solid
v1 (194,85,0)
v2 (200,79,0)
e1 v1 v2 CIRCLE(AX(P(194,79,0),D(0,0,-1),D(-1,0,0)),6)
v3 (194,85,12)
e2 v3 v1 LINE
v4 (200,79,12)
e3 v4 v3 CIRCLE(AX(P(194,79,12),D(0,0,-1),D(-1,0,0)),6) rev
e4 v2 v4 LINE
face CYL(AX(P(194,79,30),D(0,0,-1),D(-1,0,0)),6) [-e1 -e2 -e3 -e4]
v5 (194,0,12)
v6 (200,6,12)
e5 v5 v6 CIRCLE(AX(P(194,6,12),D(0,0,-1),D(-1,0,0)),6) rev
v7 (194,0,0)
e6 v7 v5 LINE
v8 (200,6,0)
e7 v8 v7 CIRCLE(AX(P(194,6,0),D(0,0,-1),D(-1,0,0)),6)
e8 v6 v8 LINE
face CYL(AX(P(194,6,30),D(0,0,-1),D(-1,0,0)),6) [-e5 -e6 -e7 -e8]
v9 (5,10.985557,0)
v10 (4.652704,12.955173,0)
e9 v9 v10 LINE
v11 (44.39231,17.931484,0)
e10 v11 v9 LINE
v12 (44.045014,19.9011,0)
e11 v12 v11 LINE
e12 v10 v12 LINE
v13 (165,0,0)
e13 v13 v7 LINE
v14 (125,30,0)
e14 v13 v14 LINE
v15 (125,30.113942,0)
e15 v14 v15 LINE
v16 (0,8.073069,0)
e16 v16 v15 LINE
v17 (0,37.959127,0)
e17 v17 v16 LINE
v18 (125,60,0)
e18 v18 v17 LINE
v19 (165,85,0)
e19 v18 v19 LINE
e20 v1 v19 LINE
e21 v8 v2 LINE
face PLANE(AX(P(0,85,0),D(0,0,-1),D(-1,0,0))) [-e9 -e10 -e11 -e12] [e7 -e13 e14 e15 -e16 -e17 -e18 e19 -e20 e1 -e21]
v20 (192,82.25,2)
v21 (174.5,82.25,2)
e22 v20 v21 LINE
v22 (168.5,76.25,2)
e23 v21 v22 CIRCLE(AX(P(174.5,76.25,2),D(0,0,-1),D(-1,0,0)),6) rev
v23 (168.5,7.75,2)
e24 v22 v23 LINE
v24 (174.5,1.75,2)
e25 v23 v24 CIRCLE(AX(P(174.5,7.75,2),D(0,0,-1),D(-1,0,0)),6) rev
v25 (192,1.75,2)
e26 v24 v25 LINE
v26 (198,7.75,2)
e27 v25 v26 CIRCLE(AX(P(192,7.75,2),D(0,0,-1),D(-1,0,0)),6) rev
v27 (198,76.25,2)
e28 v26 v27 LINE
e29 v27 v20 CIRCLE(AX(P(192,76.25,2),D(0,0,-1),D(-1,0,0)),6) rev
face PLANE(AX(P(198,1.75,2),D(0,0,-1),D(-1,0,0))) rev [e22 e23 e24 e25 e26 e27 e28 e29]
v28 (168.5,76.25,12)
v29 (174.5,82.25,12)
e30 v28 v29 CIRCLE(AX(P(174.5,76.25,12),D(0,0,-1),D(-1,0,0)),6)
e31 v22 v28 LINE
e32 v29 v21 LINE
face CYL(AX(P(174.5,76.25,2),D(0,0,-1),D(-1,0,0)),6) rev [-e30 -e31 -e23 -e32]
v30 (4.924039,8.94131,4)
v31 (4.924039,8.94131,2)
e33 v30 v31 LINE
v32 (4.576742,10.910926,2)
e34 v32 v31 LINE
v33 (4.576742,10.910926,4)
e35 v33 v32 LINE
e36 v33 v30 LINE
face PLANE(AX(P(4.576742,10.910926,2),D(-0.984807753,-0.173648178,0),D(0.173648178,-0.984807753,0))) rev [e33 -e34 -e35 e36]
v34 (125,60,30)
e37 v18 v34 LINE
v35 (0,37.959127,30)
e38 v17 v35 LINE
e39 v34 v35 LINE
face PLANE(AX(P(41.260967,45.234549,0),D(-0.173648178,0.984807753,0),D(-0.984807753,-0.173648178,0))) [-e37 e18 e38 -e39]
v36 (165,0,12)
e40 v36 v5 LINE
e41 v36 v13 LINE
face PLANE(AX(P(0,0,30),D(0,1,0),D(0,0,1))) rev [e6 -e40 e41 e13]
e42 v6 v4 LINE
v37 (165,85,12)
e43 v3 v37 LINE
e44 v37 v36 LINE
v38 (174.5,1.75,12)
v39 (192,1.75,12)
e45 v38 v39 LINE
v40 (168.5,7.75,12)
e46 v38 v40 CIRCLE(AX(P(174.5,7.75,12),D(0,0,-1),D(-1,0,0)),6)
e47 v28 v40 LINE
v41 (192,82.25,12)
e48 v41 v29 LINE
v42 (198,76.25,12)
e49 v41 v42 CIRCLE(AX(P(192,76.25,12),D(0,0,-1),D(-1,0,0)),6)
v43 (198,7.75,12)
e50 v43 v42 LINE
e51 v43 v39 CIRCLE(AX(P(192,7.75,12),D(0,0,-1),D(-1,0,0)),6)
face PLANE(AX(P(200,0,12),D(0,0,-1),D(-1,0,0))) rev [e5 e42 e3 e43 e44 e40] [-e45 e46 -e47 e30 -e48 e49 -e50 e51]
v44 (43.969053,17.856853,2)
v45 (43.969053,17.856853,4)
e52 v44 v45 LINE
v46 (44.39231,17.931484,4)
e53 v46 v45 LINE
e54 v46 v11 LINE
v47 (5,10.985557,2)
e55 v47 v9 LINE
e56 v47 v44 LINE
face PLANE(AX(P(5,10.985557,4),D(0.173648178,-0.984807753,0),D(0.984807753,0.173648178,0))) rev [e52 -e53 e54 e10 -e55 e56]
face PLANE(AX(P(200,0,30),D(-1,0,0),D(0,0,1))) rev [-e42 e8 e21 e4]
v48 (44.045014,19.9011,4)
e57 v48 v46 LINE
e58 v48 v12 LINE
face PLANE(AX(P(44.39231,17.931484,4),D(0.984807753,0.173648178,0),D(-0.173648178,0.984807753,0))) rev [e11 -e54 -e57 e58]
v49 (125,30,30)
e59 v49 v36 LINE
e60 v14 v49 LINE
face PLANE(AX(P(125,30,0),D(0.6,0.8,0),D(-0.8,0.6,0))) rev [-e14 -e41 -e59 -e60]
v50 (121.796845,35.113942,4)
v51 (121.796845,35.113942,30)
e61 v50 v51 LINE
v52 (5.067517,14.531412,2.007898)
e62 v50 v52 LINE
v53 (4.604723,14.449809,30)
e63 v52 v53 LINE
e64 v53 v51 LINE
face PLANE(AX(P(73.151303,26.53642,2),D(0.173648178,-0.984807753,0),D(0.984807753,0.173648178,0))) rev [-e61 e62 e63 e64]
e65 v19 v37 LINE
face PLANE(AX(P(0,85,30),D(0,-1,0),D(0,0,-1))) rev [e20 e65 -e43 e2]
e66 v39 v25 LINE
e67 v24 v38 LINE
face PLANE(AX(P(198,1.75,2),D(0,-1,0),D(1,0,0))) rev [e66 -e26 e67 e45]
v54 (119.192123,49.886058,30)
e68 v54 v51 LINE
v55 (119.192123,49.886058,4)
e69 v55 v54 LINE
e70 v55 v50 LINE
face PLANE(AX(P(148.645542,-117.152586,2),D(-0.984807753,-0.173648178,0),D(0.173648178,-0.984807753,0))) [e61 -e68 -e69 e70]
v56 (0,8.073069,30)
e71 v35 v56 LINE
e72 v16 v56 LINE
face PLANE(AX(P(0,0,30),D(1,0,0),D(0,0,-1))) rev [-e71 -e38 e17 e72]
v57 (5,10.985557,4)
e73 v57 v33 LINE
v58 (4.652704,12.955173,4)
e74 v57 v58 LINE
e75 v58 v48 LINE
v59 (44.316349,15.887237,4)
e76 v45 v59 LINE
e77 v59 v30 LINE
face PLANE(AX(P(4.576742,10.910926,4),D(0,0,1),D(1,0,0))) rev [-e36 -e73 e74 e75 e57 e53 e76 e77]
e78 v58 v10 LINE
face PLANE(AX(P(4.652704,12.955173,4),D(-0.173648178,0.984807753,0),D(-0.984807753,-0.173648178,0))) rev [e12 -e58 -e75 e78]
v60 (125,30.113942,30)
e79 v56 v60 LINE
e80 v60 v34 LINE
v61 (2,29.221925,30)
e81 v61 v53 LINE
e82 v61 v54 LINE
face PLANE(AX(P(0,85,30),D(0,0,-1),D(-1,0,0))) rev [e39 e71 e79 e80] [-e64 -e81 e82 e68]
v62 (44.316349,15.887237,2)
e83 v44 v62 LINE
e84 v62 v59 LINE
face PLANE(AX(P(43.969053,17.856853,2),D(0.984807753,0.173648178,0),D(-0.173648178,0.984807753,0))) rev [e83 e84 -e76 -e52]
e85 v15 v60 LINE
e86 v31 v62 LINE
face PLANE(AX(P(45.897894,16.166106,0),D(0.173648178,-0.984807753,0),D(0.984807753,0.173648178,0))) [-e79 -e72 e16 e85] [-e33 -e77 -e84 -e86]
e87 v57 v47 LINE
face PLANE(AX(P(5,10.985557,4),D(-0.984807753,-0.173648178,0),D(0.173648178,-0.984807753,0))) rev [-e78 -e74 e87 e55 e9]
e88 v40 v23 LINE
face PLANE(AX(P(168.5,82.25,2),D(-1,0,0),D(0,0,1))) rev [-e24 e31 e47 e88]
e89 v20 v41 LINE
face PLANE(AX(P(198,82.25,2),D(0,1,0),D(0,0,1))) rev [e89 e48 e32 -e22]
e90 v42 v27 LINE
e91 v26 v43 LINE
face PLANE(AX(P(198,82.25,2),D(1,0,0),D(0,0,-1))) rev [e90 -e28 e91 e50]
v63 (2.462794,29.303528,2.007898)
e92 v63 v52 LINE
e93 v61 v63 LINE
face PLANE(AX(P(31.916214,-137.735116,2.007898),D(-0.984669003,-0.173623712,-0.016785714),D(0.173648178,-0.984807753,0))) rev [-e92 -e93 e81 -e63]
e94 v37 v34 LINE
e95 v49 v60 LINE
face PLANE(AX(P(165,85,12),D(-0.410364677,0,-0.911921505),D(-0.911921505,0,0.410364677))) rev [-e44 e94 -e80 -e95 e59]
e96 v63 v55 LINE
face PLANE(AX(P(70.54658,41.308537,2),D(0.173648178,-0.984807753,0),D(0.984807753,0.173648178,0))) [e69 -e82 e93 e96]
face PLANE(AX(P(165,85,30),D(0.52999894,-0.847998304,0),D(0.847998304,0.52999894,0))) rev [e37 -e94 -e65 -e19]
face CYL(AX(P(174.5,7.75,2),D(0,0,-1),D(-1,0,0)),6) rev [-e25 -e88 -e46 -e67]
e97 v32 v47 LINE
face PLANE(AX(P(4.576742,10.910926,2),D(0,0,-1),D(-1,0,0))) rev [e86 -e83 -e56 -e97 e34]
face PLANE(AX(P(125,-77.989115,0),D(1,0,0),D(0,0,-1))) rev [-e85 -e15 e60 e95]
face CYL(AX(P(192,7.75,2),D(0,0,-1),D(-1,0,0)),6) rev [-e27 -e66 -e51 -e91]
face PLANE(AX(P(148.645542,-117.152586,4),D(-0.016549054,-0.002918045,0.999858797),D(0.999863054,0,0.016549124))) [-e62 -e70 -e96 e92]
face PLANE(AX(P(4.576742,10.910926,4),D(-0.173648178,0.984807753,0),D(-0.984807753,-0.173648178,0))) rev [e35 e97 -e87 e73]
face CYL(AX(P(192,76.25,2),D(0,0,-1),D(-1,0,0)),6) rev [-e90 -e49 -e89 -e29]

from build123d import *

# Parameters (mm, degrees)
ESQUISSE1_W              = 200
ESQUISSE1_H              = 85
BOSS_EXTRU_1_DEPTH       = 30
ENL_V_MAT_EXTRU_3_DEPTH  = 28
ESQUISSE3_W              = 35
ESQUISSE3_H              = 85
ENL_V_MAT_EXTRU_4_DEPTH  = 18
ESQUISSE4_W              = 29.5
ESQUISSE4_H              = 80.5
ENL_V_MAT_EXTRU_5_DEPTH  = 10
CHANFREIN1_SIZE2         = 40
CHANFREIN1_SIZE          = 18
ENL_V_MAT_EXTRU_18_DEPTH = 220.374109685
ENL_V_MAT_EXTRU_19_DEPTH = 220.374109685
CHANFREIN5_SIZE2         = 30
CHANFREIN5_SIZE          = 40
CHANFREIN6_SIZE2         = 25
CHANFREIN6_SIZE          = 40
ESQUISSE10_W             = 40
ESQUISSE10_H             = 2
ENL_V_MAT_EXTRU_20_DEPTH = 2
ENL_V_MAT_EXTRU_21_DEPTH = 4
CONG_6_R                 = 6
CONG_7_R                 = 6
CHANFREIN7_SIZE2         = 119
CHANFREIN7_SIZE          = 2
CHANFREIN8_SIZE          = 0.47
CHANFREIN8_SIZE_2        = 28


# Some blends are built 0.0001 mm under size
with BuildPart() as part:
    # Esquisse1 → Boss.-Extru.1 (new body)
    with BuildSketch(Plane.XY):
        with Locations((100, 42.5)):
            Rectangle(ESQUISSE1_W, ESQUISSE1_H)
    extrude(amount=BOSS_EXTRU_1_DEPTH)

    # Esquisse2 → Enlèv. mat.-Extru.3 (cut)
    with BuildSketch(Plane.XY.offset(30)):
        Polygon((119.192122608, 49.886058148), (121.796845273, 35.113941852), (4.604722665, 14.44980871), (2, 29.221925005), align=None)
    extrude(amount=-ENL_V_MAT_EXTRU_3_DEPTH, mode=Mode.SUBTRACT)

    # Esquisse3 → Enlèv. mat.-Extru.4 (cut)
    with BuildSketch(Plane.XY.offset(30)):
        with Locations((182.5, 42.5)):
            Rectangle(ESQUISSE3_W, ESQUISSE3_H)
    extrude(amount=-ENL_V_MAT_EXTRU_4_DEPTH, mode=Mode.SUBTRACT)

    # Esquisse4 → Enlèv. mat.-Extru.5 (cut)
    with BuildSketch(Plane.XY.offset(12)):
        with Locations((183.25, 42)):
            Rectangle(ESQUISSE4_W, ESQUISSE4_H)
    extrude(amount=-ENL_V_MAT_EXTRU_5_DEPTH, mode=Mode.SUBTRACT)

    # Chanfrein1
    chanfrein1_edges = [part.edges().sort_by_distance(p)[0] for p in [
        (165, 42.5, 30),
    ]]
    chanfrein1_side = [part.faces().sort_by_distance(p)[0] for p in [
        (165, 42.5, 29.64),
    ]]
    chamfer(chanfrein1_edges, length=CHANFREIN1_SIZE - 0.0001, length2=CHANFREIN1_SIZE2 - 0.0001, reference=chanfrein1_side[0])  # a hair under: the kernel refuses the full size

    # Esquisse7 → Enlèv. mat.-Extru.18 (cut, through all)
    with BuildSketch(Plane.XY.offset(30)):
        Polygon((0, 37.959127411), (125, 60), (125, 85), (0, 85), align=None)
    extrude(amount=-ENL_V_MAT_EXTRU_18_DEPTH, mode=Mode.SUBTRACT)

    # Esquisse9 → Enlèv. mat.-Extru.19 (cut, through all)
    with BuildSketch(Plane.XY.offset(30)):
        Polygon((125, 30.113941852), (0, 8.073069264), (0, 0), (125, 0), align=None)
    extrude(amount=-ENL_V_MAT_EXTRU_19_DEPTH, mode=Mode.SUBTRACT)

    # Chanfrein5
    chanfrein5_edges = [part.edges().sort_by_distance(p)[0] for p in [
        (125, 0, 15),
    ]]
    chanfrein5_side = [part.faces().sort_by_distance(p)[0] for p in [
        (125.6, 0, 15),
    ]]
    chamfer(chanfrein5_edges, length=CHANFREIN5_SIZE - 0.0001, length2=CHANFREIN5_SIZE2 - 0.0001, reference=chanfrein5_side[0])  # a hair under: the kernel refuses the full size

    # Chanfrein6
    chanfrein6_edges = [part.edges().sort_by_distance(p)[0] for p in [
        (125, 85, 15),
    ]]
    chanfrein6_side = [part.faces().sort_by_distance(p)[0] for p in [
        (125.5, 85, 15),
    ]]
    chamfer(chanfrein6_edges, length=CHANFREIN6_SIZE - 0.0001, length2=CHANFREIN6_SIZE2 - 0.0001, reference=chanfrein6_side[0])  # a hair under: the kernel refuses the full size

    # Esquisse10 → Enlèv. mat.-Extru.20 (cut)
    with BuildSketch(Plane(origin=(-1.380576153, 7.829636439, 0), x_dir=(0.9848077530122079, 0.17364817766693122, 0), z_dir=(0.17364817766693122, -0.9848077530122079, 0))):
        with Locations((26.401873766, 3)):
            Rectangle(ESQUISSE10_W, ESQUISSE10_H)
    extrude(amount=-ENL_V_MAT_EXTRU_20_DEPTH, mode=Mode.SUBTRACT)

    # Esquisse11 → Enlèv. mat.-Extru.21 (cut)
    with BuildSketch(Plane(origin=(0, 0, 0), x_dir=(-1, 0, 0), z_dir=(0, 0, -1))):
        Polygon((-5, 10.985557391), (-44.39231012, 17.931484498), (-44.045013765, 19.901100004), (-4.652703645, 12.955172897), align=None)
    extrude(amount=-ENL_V_MAT_EXTRU_21_DEPTH, mode=Mode.SUBTRACT)

    # Congé6
    cong_6_edges = [part.edges().sort_by_distance(p)[0] for p in [
        (198, 82.25, 7),
        (198, 1.75, 7),
        (168.5, 1.75, 7),
        (168.5, 82.25, 7),
    ]]
    fillet(cong_6_edges, radius=CONG_6_R)

    # Congé7
    cong_7_edges = [part.edges().sort_by_distance(p)[0] for p in [
        (200, 85, 6),
        (200, 0, 6),
    ]]
    fillet(cong_7_edges, radius=CONG_7_R)

    # Chanfrein7
    chanfrein7_edges = [part.edges().sort_by_distance(p)[0] for p in [
        (120.494483941, 42.5, 2),
    ]]
    chanfrein7_side = [part.faces().sort_by_distance(p)[0] for p in [
        (120.494483941, 42.5, 2.04),
    ]]
    chamfer(chanfrein7_edges, length=CHANFREIN7_SIZE - 0.0001, length2=CHANFREIN7_SIZE2 - 0.0001, reference=chanfrein7_side[0])  # a hair under: the kernel refuses the full size

    # Chanfrein8
    # the kernel refuses this chamfer: 28, 0.47 mm, written as the material it adds along each edge
    with BuildSketch(Plane(origin=(17.246244149, -57.243822257, 2), x_dir=(0.3939624540892155, 0.06946621004204875, -0.9164976979951431), z_dir=(-0.1736481776669307, 0.984807753012208, 0))) as chanfrein8_piece_1_section:
        Polygon((CHANFREIN8_SIZE * 0.400039959966, -CHANFREIN8_SIZE * 0.916497697995), (-CHANFREIN8_SIZE_2 * 0.916497697995, -CHANFREIN8_SIZE_2 * 0.400039959966), (0, 0), align=None)
    chanfrein8_piece_1 = extrude(amount=160.599241573, mode=Mode.PRIVATE)
    chanfrein8_piece_1 = split(chanfrein8_piece_1, bisect_by=Plane(origin=(0.668634618, 38.077025735, 2.989674186), z_dir=(0.17364817766693805, -0.9848077530122068, 0)), keep=Keep.TOP, mode=Mode.PRIVATE)
    chanfrein8_piece_1 = split(chanfrein8_piece_1, bisect_by=Plane(origin=(5.084858853, 13.03137352, 2.989674186), z_dir=(-0.17364817766693125, 0.9848077530122079, 0)), keep=Keep.TOP, mode=Mode.PRIVATE)
    add(chanfrein8_piece_1)


solid = part.part
